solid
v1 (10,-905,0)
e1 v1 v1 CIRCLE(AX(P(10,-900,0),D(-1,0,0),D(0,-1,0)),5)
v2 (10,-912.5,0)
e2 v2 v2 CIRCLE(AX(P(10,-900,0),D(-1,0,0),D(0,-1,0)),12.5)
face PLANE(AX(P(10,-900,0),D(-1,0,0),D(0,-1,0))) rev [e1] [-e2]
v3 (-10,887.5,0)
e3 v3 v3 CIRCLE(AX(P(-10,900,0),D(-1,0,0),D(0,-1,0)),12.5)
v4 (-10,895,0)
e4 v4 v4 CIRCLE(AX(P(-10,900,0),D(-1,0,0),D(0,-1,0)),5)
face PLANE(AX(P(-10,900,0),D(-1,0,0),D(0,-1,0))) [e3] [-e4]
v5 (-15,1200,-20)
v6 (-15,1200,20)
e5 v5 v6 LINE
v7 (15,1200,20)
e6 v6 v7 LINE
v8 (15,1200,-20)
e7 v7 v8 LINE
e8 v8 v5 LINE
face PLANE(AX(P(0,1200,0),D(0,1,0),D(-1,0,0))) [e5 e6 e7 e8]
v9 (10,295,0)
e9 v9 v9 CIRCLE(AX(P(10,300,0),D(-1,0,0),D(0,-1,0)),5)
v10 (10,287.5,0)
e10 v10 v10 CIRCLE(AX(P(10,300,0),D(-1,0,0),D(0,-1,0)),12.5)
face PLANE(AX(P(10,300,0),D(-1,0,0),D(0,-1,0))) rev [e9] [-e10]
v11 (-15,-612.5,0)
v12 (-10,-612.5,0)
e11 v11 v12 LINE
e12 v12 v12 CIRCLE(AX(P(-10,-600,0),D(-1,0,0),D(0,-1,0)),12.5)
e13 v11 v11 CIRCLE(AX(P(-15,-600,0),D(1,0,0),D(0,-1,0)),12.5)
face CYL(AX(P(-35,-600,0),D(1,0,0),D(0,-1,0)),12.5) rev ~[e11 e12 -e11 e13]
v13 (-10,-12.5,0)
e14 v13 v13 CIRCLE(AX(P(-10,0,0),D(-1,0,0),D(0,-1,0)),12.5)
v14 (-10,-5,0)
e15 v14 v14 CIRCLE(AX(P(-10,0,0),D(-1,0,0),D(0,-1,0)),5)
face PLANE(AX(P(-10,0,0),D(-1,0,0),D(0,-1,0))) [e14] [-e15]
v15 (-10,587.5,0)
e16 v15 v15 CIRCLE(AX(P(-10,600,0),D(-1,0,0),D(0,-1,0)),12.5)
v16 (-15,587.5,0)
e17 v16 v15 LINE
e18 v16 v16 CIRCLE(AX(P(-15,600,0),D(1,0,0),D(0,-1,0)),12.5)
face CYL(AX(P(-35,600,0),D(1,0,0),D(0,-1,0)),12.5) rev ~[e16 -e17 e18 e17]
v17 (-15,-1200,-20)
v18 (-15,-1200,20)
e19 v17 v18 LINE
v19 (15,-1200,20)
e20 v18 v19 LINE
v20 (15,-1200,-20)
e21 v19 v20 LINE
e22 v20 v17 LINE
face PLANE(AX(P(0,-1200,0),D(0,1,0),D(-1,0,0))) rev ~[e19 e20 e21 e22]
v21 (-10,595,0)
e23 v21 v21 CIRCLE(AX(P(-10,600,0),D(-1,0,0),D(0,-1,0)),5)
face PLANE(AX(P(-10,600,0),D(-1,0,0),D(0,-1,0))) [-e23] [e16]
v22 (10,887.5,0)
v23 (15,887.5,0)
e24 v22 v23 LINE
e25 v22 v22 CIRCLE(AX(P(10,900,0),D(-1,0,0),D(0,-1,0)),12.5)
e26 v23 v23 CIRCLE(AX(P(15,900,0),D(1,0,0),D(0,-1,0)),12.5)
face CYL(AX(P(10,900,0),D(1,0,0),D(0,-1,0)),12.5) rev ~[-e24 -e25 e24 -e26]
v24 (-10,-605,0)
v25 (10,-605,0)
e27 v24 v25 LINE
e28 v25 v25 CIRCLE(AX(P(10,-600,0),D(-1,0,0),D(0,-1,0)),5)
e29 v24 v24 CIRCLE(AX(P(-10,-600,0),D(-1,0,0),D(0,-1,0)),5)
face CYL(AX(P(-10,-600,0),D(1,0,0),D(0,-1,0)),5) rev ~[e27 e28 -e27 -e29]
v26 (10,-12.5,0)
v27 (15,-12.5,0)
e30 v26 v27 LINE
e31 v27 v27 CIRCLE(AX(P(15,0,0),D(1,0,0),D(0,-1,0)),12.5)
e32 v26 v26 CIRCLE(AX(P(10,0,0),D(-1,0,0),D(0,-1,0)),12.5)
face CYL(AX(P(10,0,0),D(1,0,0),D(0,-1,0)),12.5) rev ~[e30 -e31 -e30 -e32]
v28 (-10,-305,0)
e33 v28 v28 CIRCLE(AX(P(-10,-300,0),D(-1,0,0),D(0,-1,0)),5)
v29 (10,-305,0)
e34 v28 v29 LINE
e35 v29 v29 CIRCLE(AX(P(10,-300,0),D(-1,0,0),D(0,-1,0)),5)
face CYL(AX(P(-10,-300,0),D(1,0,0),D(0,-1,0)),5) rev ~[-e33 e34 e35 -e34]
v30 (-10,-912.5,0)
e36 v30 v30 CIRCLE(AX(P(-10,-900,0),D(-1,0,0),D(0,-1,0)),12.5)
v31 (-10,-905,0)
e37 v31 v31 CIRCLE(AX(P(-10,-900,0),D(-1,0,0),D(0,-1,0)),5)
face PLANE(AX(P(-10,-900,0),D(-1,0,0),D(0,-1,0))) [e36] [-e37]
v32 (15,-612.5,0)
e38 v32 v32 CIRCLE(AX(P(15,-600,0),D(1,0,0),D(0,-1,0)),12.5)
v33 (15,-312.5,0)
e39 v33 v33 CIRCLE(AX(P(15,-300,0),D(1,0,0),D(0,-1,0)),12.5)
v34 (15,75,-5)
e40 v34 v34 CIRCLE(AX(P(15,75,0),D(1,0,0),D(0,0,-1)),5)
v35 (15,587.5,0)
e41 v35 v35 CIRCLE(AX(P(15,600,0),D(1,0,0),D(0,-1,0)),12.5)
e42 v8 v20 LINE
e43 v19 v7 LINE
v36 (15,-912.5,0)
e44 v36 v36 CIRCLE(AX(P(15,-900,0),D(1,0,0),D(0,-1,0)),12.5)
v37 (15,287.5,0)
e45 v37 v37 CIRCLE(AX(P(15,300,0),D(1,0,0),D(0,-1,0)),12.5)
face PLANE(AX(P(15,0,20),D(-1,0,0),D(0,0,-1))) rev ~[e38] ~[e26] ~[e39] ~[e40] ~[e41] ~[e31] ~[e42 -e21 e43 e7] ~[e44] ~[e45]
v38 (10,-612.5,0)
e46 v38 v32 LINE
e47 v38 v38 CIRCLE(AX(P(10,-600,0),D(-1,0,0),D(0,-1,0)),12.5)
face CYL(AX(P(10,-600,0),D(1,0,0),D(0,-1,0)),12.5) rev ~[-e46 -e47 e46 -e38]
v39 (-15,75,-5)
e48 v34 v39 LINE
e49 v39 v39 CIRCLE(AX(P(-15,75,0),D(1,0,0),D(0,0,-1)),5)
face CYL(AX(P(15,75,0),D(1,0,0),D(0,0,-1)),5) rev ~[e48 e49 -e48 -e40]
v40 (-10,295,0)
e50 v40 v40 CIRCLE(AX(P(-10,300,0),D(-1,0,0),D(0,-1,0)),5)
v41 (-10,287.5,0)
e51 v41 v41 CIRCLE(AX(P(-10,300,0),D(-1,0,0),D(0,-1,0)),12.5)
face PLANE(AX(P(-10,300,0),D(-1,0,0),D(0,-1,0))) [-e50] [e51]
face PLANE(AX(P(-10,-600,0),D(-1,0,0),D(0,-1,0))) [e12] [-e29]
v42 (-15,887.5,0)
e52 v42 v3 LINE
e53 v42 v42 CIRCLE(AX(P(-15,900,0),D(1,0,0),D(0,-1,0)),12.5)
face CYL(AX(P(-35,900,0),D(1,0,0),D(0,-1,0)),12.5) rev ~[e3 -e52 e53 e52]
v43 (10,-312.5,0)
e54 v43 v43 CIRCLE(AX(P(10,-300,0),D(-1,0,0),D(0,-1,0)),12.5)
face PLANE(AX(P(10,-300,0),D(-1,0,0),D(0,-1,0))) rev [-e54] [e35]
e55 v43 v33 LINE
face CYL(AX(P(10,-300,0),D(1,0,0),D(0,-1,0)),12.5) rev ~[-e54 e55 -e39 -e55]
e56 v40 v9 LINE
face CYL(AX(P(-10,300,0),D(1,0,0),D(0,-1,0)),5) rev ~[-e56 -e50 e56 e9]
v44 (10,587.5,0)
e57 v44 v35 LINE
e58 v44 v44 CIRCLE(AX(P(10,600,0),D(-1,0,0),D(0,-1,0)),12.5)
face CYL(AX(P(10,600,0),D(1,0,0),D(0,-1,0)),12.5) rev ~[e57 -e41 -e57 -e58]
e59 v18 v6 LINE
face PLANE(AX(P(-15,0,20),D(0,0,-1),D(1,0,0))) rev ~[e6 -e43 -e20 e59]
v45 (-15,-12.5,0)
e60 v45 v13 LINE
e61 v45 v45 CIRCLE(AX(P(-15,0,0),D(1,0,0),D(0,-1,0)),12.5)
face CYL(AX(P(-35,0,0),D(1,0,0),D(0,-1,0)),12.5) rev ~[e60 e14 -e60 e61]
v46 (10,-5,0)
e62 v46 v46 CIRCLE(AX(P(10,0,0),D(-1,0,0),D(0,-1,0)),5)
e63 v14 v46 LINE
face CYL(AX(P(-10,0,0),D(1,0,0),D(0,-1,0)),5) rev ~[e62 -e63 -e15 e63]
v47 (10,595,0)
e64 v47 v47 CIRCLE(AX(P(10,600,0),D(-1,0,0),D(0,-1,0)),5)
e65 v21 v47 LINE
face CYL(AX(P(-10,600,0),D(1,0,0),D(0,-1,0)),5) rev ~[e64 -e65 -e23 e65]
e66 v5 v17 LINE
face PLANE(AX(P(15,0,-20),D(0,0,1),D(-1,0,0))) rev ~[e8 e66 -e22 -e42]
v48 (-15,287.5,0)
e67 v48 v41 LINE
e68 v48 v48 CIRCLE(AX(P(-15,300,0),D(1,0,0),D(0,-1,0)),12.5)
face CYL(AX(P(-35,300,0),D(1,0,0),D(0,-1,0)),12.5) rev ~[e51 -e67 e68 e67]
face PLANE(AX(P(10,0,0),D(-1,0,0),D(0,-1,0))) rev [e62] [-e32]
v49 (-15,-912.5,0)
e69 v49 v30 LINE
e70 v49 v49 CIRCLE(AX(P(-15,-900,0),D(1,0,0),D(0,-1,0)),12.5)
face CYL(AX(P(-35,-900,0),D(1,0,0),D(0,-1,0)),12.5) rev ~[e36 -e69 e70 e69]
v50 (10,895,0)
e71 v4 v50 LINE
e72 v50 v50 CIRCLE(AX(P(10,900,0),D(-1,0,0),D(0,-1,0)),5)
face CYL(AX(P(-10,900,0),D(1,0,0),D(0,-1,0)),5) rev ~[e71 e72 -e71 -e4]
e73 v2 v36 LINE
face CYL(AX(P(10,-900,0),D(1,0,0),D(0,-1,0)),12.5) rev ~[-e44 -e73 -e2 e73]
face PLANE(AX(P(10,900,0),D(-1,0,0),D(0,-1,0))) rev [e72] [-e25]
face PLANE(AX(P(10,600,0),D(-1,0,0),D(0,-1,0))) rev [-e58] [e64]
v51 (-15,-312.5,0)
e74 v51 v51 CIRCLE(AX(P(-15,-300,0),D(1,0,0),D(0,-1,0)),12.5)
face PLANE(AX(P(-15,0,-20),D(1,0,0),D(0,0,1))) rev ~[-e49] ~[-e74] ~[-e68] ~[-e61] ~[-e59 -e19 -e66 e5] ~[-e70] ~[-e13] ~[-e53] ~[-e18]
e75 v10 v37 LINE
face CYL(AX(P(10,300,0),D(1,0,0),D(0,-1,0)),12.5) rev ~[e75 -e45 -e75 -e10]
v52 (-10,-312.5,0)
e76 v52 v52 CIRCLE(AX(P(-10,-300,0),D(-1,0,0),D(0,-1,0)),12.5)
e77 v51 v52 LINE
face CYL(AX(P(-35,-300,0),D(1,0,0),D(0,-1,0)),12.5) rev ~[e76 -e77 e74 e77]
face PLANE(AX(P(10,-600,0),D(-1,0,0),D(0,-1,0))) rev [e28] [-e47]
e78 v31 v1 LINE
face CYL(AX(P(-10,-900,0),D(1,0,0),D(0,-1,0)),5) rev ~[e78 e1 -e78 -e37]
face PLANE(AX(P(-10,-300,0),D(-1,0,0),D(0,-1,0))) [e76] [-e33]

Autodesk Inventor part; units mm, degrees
ref_plane "YZ Plane" through (0, 0, 0) normal (1, 0, 0) x (0, 1, 0)
ref_plane "XZ Plane" through (0, 0, 0) normal (0, 1, 0) x (-1, 0, 0)
ref_plane "XY Plane" through (0, 0, 0) normal (0, 0, 1) x (1, 0, 0)
sketch "Sketch1" plane through (0, 0, 0) normal (0, 1, 0) x (-1, 0, 0)
  line L0 (15, 20) -> (-15, 20)
  line L1 (-15, 20) -> (-15, -20)
  line L2 (-15, -20) -> (15, -20)
  line L3 (15, -20) -> (15, 20)
  point P0 (0, 0)
  point P1 (15, 0)
  point P2 (0, -20)
  dimension "d0" = 40
  dimension "d1" = 30
extrude "Extrusion1" add sketch "Sketch1" along normal mid plane 2400
sketch "Sketch2" plane through (0, 0, 0) normal (0, 0, 1) x (1, 0, 0)
  line L0 (35, 0) -> (-35, 0)
  line L1 (-35, 0) -> (-35, -12.5)
  line L2 (-35, -12.5) -> (-10, -12.5)
  line L3 (-10, -12.5) -> (-10, -5)
  line L4 (-10, -5) -> (10, -5)
  line L5 (10, -5) -> (10, -12.5)
  line L6 (10, -12.5) -> (35, -12.5)
  line L7 (35, -12.5) -> (35, 0)
  point P0 (0, 0)
  point P1 (0, 0)
  dimension "d4" = 10
  dimension "d5" = 70
  dimension "d6" = 25
  dimension "d7" = 20
revolve "Revolution1" cut sketch "Sketch2" angle 360 about axis through (35, 0, 0) along (-1, 0, 0)
pattern_linear "Rectangular Pattern1" count 7 spacing 300 along (0, 1, 0) of "Revolution1" first direction both ways yes
sketch "Sketch3" plane through (15, -1200, -20) normal (1, 0, 0) x (0, 0, -1)
  circle A0 centre (-20, 1275) radius 5
  point P0 (-20, 1200)
  dimension "d12" = 10
  dimension "d13" = 75
extrude "Extrusion2" cut sketch "Sketch3" against normal through all
